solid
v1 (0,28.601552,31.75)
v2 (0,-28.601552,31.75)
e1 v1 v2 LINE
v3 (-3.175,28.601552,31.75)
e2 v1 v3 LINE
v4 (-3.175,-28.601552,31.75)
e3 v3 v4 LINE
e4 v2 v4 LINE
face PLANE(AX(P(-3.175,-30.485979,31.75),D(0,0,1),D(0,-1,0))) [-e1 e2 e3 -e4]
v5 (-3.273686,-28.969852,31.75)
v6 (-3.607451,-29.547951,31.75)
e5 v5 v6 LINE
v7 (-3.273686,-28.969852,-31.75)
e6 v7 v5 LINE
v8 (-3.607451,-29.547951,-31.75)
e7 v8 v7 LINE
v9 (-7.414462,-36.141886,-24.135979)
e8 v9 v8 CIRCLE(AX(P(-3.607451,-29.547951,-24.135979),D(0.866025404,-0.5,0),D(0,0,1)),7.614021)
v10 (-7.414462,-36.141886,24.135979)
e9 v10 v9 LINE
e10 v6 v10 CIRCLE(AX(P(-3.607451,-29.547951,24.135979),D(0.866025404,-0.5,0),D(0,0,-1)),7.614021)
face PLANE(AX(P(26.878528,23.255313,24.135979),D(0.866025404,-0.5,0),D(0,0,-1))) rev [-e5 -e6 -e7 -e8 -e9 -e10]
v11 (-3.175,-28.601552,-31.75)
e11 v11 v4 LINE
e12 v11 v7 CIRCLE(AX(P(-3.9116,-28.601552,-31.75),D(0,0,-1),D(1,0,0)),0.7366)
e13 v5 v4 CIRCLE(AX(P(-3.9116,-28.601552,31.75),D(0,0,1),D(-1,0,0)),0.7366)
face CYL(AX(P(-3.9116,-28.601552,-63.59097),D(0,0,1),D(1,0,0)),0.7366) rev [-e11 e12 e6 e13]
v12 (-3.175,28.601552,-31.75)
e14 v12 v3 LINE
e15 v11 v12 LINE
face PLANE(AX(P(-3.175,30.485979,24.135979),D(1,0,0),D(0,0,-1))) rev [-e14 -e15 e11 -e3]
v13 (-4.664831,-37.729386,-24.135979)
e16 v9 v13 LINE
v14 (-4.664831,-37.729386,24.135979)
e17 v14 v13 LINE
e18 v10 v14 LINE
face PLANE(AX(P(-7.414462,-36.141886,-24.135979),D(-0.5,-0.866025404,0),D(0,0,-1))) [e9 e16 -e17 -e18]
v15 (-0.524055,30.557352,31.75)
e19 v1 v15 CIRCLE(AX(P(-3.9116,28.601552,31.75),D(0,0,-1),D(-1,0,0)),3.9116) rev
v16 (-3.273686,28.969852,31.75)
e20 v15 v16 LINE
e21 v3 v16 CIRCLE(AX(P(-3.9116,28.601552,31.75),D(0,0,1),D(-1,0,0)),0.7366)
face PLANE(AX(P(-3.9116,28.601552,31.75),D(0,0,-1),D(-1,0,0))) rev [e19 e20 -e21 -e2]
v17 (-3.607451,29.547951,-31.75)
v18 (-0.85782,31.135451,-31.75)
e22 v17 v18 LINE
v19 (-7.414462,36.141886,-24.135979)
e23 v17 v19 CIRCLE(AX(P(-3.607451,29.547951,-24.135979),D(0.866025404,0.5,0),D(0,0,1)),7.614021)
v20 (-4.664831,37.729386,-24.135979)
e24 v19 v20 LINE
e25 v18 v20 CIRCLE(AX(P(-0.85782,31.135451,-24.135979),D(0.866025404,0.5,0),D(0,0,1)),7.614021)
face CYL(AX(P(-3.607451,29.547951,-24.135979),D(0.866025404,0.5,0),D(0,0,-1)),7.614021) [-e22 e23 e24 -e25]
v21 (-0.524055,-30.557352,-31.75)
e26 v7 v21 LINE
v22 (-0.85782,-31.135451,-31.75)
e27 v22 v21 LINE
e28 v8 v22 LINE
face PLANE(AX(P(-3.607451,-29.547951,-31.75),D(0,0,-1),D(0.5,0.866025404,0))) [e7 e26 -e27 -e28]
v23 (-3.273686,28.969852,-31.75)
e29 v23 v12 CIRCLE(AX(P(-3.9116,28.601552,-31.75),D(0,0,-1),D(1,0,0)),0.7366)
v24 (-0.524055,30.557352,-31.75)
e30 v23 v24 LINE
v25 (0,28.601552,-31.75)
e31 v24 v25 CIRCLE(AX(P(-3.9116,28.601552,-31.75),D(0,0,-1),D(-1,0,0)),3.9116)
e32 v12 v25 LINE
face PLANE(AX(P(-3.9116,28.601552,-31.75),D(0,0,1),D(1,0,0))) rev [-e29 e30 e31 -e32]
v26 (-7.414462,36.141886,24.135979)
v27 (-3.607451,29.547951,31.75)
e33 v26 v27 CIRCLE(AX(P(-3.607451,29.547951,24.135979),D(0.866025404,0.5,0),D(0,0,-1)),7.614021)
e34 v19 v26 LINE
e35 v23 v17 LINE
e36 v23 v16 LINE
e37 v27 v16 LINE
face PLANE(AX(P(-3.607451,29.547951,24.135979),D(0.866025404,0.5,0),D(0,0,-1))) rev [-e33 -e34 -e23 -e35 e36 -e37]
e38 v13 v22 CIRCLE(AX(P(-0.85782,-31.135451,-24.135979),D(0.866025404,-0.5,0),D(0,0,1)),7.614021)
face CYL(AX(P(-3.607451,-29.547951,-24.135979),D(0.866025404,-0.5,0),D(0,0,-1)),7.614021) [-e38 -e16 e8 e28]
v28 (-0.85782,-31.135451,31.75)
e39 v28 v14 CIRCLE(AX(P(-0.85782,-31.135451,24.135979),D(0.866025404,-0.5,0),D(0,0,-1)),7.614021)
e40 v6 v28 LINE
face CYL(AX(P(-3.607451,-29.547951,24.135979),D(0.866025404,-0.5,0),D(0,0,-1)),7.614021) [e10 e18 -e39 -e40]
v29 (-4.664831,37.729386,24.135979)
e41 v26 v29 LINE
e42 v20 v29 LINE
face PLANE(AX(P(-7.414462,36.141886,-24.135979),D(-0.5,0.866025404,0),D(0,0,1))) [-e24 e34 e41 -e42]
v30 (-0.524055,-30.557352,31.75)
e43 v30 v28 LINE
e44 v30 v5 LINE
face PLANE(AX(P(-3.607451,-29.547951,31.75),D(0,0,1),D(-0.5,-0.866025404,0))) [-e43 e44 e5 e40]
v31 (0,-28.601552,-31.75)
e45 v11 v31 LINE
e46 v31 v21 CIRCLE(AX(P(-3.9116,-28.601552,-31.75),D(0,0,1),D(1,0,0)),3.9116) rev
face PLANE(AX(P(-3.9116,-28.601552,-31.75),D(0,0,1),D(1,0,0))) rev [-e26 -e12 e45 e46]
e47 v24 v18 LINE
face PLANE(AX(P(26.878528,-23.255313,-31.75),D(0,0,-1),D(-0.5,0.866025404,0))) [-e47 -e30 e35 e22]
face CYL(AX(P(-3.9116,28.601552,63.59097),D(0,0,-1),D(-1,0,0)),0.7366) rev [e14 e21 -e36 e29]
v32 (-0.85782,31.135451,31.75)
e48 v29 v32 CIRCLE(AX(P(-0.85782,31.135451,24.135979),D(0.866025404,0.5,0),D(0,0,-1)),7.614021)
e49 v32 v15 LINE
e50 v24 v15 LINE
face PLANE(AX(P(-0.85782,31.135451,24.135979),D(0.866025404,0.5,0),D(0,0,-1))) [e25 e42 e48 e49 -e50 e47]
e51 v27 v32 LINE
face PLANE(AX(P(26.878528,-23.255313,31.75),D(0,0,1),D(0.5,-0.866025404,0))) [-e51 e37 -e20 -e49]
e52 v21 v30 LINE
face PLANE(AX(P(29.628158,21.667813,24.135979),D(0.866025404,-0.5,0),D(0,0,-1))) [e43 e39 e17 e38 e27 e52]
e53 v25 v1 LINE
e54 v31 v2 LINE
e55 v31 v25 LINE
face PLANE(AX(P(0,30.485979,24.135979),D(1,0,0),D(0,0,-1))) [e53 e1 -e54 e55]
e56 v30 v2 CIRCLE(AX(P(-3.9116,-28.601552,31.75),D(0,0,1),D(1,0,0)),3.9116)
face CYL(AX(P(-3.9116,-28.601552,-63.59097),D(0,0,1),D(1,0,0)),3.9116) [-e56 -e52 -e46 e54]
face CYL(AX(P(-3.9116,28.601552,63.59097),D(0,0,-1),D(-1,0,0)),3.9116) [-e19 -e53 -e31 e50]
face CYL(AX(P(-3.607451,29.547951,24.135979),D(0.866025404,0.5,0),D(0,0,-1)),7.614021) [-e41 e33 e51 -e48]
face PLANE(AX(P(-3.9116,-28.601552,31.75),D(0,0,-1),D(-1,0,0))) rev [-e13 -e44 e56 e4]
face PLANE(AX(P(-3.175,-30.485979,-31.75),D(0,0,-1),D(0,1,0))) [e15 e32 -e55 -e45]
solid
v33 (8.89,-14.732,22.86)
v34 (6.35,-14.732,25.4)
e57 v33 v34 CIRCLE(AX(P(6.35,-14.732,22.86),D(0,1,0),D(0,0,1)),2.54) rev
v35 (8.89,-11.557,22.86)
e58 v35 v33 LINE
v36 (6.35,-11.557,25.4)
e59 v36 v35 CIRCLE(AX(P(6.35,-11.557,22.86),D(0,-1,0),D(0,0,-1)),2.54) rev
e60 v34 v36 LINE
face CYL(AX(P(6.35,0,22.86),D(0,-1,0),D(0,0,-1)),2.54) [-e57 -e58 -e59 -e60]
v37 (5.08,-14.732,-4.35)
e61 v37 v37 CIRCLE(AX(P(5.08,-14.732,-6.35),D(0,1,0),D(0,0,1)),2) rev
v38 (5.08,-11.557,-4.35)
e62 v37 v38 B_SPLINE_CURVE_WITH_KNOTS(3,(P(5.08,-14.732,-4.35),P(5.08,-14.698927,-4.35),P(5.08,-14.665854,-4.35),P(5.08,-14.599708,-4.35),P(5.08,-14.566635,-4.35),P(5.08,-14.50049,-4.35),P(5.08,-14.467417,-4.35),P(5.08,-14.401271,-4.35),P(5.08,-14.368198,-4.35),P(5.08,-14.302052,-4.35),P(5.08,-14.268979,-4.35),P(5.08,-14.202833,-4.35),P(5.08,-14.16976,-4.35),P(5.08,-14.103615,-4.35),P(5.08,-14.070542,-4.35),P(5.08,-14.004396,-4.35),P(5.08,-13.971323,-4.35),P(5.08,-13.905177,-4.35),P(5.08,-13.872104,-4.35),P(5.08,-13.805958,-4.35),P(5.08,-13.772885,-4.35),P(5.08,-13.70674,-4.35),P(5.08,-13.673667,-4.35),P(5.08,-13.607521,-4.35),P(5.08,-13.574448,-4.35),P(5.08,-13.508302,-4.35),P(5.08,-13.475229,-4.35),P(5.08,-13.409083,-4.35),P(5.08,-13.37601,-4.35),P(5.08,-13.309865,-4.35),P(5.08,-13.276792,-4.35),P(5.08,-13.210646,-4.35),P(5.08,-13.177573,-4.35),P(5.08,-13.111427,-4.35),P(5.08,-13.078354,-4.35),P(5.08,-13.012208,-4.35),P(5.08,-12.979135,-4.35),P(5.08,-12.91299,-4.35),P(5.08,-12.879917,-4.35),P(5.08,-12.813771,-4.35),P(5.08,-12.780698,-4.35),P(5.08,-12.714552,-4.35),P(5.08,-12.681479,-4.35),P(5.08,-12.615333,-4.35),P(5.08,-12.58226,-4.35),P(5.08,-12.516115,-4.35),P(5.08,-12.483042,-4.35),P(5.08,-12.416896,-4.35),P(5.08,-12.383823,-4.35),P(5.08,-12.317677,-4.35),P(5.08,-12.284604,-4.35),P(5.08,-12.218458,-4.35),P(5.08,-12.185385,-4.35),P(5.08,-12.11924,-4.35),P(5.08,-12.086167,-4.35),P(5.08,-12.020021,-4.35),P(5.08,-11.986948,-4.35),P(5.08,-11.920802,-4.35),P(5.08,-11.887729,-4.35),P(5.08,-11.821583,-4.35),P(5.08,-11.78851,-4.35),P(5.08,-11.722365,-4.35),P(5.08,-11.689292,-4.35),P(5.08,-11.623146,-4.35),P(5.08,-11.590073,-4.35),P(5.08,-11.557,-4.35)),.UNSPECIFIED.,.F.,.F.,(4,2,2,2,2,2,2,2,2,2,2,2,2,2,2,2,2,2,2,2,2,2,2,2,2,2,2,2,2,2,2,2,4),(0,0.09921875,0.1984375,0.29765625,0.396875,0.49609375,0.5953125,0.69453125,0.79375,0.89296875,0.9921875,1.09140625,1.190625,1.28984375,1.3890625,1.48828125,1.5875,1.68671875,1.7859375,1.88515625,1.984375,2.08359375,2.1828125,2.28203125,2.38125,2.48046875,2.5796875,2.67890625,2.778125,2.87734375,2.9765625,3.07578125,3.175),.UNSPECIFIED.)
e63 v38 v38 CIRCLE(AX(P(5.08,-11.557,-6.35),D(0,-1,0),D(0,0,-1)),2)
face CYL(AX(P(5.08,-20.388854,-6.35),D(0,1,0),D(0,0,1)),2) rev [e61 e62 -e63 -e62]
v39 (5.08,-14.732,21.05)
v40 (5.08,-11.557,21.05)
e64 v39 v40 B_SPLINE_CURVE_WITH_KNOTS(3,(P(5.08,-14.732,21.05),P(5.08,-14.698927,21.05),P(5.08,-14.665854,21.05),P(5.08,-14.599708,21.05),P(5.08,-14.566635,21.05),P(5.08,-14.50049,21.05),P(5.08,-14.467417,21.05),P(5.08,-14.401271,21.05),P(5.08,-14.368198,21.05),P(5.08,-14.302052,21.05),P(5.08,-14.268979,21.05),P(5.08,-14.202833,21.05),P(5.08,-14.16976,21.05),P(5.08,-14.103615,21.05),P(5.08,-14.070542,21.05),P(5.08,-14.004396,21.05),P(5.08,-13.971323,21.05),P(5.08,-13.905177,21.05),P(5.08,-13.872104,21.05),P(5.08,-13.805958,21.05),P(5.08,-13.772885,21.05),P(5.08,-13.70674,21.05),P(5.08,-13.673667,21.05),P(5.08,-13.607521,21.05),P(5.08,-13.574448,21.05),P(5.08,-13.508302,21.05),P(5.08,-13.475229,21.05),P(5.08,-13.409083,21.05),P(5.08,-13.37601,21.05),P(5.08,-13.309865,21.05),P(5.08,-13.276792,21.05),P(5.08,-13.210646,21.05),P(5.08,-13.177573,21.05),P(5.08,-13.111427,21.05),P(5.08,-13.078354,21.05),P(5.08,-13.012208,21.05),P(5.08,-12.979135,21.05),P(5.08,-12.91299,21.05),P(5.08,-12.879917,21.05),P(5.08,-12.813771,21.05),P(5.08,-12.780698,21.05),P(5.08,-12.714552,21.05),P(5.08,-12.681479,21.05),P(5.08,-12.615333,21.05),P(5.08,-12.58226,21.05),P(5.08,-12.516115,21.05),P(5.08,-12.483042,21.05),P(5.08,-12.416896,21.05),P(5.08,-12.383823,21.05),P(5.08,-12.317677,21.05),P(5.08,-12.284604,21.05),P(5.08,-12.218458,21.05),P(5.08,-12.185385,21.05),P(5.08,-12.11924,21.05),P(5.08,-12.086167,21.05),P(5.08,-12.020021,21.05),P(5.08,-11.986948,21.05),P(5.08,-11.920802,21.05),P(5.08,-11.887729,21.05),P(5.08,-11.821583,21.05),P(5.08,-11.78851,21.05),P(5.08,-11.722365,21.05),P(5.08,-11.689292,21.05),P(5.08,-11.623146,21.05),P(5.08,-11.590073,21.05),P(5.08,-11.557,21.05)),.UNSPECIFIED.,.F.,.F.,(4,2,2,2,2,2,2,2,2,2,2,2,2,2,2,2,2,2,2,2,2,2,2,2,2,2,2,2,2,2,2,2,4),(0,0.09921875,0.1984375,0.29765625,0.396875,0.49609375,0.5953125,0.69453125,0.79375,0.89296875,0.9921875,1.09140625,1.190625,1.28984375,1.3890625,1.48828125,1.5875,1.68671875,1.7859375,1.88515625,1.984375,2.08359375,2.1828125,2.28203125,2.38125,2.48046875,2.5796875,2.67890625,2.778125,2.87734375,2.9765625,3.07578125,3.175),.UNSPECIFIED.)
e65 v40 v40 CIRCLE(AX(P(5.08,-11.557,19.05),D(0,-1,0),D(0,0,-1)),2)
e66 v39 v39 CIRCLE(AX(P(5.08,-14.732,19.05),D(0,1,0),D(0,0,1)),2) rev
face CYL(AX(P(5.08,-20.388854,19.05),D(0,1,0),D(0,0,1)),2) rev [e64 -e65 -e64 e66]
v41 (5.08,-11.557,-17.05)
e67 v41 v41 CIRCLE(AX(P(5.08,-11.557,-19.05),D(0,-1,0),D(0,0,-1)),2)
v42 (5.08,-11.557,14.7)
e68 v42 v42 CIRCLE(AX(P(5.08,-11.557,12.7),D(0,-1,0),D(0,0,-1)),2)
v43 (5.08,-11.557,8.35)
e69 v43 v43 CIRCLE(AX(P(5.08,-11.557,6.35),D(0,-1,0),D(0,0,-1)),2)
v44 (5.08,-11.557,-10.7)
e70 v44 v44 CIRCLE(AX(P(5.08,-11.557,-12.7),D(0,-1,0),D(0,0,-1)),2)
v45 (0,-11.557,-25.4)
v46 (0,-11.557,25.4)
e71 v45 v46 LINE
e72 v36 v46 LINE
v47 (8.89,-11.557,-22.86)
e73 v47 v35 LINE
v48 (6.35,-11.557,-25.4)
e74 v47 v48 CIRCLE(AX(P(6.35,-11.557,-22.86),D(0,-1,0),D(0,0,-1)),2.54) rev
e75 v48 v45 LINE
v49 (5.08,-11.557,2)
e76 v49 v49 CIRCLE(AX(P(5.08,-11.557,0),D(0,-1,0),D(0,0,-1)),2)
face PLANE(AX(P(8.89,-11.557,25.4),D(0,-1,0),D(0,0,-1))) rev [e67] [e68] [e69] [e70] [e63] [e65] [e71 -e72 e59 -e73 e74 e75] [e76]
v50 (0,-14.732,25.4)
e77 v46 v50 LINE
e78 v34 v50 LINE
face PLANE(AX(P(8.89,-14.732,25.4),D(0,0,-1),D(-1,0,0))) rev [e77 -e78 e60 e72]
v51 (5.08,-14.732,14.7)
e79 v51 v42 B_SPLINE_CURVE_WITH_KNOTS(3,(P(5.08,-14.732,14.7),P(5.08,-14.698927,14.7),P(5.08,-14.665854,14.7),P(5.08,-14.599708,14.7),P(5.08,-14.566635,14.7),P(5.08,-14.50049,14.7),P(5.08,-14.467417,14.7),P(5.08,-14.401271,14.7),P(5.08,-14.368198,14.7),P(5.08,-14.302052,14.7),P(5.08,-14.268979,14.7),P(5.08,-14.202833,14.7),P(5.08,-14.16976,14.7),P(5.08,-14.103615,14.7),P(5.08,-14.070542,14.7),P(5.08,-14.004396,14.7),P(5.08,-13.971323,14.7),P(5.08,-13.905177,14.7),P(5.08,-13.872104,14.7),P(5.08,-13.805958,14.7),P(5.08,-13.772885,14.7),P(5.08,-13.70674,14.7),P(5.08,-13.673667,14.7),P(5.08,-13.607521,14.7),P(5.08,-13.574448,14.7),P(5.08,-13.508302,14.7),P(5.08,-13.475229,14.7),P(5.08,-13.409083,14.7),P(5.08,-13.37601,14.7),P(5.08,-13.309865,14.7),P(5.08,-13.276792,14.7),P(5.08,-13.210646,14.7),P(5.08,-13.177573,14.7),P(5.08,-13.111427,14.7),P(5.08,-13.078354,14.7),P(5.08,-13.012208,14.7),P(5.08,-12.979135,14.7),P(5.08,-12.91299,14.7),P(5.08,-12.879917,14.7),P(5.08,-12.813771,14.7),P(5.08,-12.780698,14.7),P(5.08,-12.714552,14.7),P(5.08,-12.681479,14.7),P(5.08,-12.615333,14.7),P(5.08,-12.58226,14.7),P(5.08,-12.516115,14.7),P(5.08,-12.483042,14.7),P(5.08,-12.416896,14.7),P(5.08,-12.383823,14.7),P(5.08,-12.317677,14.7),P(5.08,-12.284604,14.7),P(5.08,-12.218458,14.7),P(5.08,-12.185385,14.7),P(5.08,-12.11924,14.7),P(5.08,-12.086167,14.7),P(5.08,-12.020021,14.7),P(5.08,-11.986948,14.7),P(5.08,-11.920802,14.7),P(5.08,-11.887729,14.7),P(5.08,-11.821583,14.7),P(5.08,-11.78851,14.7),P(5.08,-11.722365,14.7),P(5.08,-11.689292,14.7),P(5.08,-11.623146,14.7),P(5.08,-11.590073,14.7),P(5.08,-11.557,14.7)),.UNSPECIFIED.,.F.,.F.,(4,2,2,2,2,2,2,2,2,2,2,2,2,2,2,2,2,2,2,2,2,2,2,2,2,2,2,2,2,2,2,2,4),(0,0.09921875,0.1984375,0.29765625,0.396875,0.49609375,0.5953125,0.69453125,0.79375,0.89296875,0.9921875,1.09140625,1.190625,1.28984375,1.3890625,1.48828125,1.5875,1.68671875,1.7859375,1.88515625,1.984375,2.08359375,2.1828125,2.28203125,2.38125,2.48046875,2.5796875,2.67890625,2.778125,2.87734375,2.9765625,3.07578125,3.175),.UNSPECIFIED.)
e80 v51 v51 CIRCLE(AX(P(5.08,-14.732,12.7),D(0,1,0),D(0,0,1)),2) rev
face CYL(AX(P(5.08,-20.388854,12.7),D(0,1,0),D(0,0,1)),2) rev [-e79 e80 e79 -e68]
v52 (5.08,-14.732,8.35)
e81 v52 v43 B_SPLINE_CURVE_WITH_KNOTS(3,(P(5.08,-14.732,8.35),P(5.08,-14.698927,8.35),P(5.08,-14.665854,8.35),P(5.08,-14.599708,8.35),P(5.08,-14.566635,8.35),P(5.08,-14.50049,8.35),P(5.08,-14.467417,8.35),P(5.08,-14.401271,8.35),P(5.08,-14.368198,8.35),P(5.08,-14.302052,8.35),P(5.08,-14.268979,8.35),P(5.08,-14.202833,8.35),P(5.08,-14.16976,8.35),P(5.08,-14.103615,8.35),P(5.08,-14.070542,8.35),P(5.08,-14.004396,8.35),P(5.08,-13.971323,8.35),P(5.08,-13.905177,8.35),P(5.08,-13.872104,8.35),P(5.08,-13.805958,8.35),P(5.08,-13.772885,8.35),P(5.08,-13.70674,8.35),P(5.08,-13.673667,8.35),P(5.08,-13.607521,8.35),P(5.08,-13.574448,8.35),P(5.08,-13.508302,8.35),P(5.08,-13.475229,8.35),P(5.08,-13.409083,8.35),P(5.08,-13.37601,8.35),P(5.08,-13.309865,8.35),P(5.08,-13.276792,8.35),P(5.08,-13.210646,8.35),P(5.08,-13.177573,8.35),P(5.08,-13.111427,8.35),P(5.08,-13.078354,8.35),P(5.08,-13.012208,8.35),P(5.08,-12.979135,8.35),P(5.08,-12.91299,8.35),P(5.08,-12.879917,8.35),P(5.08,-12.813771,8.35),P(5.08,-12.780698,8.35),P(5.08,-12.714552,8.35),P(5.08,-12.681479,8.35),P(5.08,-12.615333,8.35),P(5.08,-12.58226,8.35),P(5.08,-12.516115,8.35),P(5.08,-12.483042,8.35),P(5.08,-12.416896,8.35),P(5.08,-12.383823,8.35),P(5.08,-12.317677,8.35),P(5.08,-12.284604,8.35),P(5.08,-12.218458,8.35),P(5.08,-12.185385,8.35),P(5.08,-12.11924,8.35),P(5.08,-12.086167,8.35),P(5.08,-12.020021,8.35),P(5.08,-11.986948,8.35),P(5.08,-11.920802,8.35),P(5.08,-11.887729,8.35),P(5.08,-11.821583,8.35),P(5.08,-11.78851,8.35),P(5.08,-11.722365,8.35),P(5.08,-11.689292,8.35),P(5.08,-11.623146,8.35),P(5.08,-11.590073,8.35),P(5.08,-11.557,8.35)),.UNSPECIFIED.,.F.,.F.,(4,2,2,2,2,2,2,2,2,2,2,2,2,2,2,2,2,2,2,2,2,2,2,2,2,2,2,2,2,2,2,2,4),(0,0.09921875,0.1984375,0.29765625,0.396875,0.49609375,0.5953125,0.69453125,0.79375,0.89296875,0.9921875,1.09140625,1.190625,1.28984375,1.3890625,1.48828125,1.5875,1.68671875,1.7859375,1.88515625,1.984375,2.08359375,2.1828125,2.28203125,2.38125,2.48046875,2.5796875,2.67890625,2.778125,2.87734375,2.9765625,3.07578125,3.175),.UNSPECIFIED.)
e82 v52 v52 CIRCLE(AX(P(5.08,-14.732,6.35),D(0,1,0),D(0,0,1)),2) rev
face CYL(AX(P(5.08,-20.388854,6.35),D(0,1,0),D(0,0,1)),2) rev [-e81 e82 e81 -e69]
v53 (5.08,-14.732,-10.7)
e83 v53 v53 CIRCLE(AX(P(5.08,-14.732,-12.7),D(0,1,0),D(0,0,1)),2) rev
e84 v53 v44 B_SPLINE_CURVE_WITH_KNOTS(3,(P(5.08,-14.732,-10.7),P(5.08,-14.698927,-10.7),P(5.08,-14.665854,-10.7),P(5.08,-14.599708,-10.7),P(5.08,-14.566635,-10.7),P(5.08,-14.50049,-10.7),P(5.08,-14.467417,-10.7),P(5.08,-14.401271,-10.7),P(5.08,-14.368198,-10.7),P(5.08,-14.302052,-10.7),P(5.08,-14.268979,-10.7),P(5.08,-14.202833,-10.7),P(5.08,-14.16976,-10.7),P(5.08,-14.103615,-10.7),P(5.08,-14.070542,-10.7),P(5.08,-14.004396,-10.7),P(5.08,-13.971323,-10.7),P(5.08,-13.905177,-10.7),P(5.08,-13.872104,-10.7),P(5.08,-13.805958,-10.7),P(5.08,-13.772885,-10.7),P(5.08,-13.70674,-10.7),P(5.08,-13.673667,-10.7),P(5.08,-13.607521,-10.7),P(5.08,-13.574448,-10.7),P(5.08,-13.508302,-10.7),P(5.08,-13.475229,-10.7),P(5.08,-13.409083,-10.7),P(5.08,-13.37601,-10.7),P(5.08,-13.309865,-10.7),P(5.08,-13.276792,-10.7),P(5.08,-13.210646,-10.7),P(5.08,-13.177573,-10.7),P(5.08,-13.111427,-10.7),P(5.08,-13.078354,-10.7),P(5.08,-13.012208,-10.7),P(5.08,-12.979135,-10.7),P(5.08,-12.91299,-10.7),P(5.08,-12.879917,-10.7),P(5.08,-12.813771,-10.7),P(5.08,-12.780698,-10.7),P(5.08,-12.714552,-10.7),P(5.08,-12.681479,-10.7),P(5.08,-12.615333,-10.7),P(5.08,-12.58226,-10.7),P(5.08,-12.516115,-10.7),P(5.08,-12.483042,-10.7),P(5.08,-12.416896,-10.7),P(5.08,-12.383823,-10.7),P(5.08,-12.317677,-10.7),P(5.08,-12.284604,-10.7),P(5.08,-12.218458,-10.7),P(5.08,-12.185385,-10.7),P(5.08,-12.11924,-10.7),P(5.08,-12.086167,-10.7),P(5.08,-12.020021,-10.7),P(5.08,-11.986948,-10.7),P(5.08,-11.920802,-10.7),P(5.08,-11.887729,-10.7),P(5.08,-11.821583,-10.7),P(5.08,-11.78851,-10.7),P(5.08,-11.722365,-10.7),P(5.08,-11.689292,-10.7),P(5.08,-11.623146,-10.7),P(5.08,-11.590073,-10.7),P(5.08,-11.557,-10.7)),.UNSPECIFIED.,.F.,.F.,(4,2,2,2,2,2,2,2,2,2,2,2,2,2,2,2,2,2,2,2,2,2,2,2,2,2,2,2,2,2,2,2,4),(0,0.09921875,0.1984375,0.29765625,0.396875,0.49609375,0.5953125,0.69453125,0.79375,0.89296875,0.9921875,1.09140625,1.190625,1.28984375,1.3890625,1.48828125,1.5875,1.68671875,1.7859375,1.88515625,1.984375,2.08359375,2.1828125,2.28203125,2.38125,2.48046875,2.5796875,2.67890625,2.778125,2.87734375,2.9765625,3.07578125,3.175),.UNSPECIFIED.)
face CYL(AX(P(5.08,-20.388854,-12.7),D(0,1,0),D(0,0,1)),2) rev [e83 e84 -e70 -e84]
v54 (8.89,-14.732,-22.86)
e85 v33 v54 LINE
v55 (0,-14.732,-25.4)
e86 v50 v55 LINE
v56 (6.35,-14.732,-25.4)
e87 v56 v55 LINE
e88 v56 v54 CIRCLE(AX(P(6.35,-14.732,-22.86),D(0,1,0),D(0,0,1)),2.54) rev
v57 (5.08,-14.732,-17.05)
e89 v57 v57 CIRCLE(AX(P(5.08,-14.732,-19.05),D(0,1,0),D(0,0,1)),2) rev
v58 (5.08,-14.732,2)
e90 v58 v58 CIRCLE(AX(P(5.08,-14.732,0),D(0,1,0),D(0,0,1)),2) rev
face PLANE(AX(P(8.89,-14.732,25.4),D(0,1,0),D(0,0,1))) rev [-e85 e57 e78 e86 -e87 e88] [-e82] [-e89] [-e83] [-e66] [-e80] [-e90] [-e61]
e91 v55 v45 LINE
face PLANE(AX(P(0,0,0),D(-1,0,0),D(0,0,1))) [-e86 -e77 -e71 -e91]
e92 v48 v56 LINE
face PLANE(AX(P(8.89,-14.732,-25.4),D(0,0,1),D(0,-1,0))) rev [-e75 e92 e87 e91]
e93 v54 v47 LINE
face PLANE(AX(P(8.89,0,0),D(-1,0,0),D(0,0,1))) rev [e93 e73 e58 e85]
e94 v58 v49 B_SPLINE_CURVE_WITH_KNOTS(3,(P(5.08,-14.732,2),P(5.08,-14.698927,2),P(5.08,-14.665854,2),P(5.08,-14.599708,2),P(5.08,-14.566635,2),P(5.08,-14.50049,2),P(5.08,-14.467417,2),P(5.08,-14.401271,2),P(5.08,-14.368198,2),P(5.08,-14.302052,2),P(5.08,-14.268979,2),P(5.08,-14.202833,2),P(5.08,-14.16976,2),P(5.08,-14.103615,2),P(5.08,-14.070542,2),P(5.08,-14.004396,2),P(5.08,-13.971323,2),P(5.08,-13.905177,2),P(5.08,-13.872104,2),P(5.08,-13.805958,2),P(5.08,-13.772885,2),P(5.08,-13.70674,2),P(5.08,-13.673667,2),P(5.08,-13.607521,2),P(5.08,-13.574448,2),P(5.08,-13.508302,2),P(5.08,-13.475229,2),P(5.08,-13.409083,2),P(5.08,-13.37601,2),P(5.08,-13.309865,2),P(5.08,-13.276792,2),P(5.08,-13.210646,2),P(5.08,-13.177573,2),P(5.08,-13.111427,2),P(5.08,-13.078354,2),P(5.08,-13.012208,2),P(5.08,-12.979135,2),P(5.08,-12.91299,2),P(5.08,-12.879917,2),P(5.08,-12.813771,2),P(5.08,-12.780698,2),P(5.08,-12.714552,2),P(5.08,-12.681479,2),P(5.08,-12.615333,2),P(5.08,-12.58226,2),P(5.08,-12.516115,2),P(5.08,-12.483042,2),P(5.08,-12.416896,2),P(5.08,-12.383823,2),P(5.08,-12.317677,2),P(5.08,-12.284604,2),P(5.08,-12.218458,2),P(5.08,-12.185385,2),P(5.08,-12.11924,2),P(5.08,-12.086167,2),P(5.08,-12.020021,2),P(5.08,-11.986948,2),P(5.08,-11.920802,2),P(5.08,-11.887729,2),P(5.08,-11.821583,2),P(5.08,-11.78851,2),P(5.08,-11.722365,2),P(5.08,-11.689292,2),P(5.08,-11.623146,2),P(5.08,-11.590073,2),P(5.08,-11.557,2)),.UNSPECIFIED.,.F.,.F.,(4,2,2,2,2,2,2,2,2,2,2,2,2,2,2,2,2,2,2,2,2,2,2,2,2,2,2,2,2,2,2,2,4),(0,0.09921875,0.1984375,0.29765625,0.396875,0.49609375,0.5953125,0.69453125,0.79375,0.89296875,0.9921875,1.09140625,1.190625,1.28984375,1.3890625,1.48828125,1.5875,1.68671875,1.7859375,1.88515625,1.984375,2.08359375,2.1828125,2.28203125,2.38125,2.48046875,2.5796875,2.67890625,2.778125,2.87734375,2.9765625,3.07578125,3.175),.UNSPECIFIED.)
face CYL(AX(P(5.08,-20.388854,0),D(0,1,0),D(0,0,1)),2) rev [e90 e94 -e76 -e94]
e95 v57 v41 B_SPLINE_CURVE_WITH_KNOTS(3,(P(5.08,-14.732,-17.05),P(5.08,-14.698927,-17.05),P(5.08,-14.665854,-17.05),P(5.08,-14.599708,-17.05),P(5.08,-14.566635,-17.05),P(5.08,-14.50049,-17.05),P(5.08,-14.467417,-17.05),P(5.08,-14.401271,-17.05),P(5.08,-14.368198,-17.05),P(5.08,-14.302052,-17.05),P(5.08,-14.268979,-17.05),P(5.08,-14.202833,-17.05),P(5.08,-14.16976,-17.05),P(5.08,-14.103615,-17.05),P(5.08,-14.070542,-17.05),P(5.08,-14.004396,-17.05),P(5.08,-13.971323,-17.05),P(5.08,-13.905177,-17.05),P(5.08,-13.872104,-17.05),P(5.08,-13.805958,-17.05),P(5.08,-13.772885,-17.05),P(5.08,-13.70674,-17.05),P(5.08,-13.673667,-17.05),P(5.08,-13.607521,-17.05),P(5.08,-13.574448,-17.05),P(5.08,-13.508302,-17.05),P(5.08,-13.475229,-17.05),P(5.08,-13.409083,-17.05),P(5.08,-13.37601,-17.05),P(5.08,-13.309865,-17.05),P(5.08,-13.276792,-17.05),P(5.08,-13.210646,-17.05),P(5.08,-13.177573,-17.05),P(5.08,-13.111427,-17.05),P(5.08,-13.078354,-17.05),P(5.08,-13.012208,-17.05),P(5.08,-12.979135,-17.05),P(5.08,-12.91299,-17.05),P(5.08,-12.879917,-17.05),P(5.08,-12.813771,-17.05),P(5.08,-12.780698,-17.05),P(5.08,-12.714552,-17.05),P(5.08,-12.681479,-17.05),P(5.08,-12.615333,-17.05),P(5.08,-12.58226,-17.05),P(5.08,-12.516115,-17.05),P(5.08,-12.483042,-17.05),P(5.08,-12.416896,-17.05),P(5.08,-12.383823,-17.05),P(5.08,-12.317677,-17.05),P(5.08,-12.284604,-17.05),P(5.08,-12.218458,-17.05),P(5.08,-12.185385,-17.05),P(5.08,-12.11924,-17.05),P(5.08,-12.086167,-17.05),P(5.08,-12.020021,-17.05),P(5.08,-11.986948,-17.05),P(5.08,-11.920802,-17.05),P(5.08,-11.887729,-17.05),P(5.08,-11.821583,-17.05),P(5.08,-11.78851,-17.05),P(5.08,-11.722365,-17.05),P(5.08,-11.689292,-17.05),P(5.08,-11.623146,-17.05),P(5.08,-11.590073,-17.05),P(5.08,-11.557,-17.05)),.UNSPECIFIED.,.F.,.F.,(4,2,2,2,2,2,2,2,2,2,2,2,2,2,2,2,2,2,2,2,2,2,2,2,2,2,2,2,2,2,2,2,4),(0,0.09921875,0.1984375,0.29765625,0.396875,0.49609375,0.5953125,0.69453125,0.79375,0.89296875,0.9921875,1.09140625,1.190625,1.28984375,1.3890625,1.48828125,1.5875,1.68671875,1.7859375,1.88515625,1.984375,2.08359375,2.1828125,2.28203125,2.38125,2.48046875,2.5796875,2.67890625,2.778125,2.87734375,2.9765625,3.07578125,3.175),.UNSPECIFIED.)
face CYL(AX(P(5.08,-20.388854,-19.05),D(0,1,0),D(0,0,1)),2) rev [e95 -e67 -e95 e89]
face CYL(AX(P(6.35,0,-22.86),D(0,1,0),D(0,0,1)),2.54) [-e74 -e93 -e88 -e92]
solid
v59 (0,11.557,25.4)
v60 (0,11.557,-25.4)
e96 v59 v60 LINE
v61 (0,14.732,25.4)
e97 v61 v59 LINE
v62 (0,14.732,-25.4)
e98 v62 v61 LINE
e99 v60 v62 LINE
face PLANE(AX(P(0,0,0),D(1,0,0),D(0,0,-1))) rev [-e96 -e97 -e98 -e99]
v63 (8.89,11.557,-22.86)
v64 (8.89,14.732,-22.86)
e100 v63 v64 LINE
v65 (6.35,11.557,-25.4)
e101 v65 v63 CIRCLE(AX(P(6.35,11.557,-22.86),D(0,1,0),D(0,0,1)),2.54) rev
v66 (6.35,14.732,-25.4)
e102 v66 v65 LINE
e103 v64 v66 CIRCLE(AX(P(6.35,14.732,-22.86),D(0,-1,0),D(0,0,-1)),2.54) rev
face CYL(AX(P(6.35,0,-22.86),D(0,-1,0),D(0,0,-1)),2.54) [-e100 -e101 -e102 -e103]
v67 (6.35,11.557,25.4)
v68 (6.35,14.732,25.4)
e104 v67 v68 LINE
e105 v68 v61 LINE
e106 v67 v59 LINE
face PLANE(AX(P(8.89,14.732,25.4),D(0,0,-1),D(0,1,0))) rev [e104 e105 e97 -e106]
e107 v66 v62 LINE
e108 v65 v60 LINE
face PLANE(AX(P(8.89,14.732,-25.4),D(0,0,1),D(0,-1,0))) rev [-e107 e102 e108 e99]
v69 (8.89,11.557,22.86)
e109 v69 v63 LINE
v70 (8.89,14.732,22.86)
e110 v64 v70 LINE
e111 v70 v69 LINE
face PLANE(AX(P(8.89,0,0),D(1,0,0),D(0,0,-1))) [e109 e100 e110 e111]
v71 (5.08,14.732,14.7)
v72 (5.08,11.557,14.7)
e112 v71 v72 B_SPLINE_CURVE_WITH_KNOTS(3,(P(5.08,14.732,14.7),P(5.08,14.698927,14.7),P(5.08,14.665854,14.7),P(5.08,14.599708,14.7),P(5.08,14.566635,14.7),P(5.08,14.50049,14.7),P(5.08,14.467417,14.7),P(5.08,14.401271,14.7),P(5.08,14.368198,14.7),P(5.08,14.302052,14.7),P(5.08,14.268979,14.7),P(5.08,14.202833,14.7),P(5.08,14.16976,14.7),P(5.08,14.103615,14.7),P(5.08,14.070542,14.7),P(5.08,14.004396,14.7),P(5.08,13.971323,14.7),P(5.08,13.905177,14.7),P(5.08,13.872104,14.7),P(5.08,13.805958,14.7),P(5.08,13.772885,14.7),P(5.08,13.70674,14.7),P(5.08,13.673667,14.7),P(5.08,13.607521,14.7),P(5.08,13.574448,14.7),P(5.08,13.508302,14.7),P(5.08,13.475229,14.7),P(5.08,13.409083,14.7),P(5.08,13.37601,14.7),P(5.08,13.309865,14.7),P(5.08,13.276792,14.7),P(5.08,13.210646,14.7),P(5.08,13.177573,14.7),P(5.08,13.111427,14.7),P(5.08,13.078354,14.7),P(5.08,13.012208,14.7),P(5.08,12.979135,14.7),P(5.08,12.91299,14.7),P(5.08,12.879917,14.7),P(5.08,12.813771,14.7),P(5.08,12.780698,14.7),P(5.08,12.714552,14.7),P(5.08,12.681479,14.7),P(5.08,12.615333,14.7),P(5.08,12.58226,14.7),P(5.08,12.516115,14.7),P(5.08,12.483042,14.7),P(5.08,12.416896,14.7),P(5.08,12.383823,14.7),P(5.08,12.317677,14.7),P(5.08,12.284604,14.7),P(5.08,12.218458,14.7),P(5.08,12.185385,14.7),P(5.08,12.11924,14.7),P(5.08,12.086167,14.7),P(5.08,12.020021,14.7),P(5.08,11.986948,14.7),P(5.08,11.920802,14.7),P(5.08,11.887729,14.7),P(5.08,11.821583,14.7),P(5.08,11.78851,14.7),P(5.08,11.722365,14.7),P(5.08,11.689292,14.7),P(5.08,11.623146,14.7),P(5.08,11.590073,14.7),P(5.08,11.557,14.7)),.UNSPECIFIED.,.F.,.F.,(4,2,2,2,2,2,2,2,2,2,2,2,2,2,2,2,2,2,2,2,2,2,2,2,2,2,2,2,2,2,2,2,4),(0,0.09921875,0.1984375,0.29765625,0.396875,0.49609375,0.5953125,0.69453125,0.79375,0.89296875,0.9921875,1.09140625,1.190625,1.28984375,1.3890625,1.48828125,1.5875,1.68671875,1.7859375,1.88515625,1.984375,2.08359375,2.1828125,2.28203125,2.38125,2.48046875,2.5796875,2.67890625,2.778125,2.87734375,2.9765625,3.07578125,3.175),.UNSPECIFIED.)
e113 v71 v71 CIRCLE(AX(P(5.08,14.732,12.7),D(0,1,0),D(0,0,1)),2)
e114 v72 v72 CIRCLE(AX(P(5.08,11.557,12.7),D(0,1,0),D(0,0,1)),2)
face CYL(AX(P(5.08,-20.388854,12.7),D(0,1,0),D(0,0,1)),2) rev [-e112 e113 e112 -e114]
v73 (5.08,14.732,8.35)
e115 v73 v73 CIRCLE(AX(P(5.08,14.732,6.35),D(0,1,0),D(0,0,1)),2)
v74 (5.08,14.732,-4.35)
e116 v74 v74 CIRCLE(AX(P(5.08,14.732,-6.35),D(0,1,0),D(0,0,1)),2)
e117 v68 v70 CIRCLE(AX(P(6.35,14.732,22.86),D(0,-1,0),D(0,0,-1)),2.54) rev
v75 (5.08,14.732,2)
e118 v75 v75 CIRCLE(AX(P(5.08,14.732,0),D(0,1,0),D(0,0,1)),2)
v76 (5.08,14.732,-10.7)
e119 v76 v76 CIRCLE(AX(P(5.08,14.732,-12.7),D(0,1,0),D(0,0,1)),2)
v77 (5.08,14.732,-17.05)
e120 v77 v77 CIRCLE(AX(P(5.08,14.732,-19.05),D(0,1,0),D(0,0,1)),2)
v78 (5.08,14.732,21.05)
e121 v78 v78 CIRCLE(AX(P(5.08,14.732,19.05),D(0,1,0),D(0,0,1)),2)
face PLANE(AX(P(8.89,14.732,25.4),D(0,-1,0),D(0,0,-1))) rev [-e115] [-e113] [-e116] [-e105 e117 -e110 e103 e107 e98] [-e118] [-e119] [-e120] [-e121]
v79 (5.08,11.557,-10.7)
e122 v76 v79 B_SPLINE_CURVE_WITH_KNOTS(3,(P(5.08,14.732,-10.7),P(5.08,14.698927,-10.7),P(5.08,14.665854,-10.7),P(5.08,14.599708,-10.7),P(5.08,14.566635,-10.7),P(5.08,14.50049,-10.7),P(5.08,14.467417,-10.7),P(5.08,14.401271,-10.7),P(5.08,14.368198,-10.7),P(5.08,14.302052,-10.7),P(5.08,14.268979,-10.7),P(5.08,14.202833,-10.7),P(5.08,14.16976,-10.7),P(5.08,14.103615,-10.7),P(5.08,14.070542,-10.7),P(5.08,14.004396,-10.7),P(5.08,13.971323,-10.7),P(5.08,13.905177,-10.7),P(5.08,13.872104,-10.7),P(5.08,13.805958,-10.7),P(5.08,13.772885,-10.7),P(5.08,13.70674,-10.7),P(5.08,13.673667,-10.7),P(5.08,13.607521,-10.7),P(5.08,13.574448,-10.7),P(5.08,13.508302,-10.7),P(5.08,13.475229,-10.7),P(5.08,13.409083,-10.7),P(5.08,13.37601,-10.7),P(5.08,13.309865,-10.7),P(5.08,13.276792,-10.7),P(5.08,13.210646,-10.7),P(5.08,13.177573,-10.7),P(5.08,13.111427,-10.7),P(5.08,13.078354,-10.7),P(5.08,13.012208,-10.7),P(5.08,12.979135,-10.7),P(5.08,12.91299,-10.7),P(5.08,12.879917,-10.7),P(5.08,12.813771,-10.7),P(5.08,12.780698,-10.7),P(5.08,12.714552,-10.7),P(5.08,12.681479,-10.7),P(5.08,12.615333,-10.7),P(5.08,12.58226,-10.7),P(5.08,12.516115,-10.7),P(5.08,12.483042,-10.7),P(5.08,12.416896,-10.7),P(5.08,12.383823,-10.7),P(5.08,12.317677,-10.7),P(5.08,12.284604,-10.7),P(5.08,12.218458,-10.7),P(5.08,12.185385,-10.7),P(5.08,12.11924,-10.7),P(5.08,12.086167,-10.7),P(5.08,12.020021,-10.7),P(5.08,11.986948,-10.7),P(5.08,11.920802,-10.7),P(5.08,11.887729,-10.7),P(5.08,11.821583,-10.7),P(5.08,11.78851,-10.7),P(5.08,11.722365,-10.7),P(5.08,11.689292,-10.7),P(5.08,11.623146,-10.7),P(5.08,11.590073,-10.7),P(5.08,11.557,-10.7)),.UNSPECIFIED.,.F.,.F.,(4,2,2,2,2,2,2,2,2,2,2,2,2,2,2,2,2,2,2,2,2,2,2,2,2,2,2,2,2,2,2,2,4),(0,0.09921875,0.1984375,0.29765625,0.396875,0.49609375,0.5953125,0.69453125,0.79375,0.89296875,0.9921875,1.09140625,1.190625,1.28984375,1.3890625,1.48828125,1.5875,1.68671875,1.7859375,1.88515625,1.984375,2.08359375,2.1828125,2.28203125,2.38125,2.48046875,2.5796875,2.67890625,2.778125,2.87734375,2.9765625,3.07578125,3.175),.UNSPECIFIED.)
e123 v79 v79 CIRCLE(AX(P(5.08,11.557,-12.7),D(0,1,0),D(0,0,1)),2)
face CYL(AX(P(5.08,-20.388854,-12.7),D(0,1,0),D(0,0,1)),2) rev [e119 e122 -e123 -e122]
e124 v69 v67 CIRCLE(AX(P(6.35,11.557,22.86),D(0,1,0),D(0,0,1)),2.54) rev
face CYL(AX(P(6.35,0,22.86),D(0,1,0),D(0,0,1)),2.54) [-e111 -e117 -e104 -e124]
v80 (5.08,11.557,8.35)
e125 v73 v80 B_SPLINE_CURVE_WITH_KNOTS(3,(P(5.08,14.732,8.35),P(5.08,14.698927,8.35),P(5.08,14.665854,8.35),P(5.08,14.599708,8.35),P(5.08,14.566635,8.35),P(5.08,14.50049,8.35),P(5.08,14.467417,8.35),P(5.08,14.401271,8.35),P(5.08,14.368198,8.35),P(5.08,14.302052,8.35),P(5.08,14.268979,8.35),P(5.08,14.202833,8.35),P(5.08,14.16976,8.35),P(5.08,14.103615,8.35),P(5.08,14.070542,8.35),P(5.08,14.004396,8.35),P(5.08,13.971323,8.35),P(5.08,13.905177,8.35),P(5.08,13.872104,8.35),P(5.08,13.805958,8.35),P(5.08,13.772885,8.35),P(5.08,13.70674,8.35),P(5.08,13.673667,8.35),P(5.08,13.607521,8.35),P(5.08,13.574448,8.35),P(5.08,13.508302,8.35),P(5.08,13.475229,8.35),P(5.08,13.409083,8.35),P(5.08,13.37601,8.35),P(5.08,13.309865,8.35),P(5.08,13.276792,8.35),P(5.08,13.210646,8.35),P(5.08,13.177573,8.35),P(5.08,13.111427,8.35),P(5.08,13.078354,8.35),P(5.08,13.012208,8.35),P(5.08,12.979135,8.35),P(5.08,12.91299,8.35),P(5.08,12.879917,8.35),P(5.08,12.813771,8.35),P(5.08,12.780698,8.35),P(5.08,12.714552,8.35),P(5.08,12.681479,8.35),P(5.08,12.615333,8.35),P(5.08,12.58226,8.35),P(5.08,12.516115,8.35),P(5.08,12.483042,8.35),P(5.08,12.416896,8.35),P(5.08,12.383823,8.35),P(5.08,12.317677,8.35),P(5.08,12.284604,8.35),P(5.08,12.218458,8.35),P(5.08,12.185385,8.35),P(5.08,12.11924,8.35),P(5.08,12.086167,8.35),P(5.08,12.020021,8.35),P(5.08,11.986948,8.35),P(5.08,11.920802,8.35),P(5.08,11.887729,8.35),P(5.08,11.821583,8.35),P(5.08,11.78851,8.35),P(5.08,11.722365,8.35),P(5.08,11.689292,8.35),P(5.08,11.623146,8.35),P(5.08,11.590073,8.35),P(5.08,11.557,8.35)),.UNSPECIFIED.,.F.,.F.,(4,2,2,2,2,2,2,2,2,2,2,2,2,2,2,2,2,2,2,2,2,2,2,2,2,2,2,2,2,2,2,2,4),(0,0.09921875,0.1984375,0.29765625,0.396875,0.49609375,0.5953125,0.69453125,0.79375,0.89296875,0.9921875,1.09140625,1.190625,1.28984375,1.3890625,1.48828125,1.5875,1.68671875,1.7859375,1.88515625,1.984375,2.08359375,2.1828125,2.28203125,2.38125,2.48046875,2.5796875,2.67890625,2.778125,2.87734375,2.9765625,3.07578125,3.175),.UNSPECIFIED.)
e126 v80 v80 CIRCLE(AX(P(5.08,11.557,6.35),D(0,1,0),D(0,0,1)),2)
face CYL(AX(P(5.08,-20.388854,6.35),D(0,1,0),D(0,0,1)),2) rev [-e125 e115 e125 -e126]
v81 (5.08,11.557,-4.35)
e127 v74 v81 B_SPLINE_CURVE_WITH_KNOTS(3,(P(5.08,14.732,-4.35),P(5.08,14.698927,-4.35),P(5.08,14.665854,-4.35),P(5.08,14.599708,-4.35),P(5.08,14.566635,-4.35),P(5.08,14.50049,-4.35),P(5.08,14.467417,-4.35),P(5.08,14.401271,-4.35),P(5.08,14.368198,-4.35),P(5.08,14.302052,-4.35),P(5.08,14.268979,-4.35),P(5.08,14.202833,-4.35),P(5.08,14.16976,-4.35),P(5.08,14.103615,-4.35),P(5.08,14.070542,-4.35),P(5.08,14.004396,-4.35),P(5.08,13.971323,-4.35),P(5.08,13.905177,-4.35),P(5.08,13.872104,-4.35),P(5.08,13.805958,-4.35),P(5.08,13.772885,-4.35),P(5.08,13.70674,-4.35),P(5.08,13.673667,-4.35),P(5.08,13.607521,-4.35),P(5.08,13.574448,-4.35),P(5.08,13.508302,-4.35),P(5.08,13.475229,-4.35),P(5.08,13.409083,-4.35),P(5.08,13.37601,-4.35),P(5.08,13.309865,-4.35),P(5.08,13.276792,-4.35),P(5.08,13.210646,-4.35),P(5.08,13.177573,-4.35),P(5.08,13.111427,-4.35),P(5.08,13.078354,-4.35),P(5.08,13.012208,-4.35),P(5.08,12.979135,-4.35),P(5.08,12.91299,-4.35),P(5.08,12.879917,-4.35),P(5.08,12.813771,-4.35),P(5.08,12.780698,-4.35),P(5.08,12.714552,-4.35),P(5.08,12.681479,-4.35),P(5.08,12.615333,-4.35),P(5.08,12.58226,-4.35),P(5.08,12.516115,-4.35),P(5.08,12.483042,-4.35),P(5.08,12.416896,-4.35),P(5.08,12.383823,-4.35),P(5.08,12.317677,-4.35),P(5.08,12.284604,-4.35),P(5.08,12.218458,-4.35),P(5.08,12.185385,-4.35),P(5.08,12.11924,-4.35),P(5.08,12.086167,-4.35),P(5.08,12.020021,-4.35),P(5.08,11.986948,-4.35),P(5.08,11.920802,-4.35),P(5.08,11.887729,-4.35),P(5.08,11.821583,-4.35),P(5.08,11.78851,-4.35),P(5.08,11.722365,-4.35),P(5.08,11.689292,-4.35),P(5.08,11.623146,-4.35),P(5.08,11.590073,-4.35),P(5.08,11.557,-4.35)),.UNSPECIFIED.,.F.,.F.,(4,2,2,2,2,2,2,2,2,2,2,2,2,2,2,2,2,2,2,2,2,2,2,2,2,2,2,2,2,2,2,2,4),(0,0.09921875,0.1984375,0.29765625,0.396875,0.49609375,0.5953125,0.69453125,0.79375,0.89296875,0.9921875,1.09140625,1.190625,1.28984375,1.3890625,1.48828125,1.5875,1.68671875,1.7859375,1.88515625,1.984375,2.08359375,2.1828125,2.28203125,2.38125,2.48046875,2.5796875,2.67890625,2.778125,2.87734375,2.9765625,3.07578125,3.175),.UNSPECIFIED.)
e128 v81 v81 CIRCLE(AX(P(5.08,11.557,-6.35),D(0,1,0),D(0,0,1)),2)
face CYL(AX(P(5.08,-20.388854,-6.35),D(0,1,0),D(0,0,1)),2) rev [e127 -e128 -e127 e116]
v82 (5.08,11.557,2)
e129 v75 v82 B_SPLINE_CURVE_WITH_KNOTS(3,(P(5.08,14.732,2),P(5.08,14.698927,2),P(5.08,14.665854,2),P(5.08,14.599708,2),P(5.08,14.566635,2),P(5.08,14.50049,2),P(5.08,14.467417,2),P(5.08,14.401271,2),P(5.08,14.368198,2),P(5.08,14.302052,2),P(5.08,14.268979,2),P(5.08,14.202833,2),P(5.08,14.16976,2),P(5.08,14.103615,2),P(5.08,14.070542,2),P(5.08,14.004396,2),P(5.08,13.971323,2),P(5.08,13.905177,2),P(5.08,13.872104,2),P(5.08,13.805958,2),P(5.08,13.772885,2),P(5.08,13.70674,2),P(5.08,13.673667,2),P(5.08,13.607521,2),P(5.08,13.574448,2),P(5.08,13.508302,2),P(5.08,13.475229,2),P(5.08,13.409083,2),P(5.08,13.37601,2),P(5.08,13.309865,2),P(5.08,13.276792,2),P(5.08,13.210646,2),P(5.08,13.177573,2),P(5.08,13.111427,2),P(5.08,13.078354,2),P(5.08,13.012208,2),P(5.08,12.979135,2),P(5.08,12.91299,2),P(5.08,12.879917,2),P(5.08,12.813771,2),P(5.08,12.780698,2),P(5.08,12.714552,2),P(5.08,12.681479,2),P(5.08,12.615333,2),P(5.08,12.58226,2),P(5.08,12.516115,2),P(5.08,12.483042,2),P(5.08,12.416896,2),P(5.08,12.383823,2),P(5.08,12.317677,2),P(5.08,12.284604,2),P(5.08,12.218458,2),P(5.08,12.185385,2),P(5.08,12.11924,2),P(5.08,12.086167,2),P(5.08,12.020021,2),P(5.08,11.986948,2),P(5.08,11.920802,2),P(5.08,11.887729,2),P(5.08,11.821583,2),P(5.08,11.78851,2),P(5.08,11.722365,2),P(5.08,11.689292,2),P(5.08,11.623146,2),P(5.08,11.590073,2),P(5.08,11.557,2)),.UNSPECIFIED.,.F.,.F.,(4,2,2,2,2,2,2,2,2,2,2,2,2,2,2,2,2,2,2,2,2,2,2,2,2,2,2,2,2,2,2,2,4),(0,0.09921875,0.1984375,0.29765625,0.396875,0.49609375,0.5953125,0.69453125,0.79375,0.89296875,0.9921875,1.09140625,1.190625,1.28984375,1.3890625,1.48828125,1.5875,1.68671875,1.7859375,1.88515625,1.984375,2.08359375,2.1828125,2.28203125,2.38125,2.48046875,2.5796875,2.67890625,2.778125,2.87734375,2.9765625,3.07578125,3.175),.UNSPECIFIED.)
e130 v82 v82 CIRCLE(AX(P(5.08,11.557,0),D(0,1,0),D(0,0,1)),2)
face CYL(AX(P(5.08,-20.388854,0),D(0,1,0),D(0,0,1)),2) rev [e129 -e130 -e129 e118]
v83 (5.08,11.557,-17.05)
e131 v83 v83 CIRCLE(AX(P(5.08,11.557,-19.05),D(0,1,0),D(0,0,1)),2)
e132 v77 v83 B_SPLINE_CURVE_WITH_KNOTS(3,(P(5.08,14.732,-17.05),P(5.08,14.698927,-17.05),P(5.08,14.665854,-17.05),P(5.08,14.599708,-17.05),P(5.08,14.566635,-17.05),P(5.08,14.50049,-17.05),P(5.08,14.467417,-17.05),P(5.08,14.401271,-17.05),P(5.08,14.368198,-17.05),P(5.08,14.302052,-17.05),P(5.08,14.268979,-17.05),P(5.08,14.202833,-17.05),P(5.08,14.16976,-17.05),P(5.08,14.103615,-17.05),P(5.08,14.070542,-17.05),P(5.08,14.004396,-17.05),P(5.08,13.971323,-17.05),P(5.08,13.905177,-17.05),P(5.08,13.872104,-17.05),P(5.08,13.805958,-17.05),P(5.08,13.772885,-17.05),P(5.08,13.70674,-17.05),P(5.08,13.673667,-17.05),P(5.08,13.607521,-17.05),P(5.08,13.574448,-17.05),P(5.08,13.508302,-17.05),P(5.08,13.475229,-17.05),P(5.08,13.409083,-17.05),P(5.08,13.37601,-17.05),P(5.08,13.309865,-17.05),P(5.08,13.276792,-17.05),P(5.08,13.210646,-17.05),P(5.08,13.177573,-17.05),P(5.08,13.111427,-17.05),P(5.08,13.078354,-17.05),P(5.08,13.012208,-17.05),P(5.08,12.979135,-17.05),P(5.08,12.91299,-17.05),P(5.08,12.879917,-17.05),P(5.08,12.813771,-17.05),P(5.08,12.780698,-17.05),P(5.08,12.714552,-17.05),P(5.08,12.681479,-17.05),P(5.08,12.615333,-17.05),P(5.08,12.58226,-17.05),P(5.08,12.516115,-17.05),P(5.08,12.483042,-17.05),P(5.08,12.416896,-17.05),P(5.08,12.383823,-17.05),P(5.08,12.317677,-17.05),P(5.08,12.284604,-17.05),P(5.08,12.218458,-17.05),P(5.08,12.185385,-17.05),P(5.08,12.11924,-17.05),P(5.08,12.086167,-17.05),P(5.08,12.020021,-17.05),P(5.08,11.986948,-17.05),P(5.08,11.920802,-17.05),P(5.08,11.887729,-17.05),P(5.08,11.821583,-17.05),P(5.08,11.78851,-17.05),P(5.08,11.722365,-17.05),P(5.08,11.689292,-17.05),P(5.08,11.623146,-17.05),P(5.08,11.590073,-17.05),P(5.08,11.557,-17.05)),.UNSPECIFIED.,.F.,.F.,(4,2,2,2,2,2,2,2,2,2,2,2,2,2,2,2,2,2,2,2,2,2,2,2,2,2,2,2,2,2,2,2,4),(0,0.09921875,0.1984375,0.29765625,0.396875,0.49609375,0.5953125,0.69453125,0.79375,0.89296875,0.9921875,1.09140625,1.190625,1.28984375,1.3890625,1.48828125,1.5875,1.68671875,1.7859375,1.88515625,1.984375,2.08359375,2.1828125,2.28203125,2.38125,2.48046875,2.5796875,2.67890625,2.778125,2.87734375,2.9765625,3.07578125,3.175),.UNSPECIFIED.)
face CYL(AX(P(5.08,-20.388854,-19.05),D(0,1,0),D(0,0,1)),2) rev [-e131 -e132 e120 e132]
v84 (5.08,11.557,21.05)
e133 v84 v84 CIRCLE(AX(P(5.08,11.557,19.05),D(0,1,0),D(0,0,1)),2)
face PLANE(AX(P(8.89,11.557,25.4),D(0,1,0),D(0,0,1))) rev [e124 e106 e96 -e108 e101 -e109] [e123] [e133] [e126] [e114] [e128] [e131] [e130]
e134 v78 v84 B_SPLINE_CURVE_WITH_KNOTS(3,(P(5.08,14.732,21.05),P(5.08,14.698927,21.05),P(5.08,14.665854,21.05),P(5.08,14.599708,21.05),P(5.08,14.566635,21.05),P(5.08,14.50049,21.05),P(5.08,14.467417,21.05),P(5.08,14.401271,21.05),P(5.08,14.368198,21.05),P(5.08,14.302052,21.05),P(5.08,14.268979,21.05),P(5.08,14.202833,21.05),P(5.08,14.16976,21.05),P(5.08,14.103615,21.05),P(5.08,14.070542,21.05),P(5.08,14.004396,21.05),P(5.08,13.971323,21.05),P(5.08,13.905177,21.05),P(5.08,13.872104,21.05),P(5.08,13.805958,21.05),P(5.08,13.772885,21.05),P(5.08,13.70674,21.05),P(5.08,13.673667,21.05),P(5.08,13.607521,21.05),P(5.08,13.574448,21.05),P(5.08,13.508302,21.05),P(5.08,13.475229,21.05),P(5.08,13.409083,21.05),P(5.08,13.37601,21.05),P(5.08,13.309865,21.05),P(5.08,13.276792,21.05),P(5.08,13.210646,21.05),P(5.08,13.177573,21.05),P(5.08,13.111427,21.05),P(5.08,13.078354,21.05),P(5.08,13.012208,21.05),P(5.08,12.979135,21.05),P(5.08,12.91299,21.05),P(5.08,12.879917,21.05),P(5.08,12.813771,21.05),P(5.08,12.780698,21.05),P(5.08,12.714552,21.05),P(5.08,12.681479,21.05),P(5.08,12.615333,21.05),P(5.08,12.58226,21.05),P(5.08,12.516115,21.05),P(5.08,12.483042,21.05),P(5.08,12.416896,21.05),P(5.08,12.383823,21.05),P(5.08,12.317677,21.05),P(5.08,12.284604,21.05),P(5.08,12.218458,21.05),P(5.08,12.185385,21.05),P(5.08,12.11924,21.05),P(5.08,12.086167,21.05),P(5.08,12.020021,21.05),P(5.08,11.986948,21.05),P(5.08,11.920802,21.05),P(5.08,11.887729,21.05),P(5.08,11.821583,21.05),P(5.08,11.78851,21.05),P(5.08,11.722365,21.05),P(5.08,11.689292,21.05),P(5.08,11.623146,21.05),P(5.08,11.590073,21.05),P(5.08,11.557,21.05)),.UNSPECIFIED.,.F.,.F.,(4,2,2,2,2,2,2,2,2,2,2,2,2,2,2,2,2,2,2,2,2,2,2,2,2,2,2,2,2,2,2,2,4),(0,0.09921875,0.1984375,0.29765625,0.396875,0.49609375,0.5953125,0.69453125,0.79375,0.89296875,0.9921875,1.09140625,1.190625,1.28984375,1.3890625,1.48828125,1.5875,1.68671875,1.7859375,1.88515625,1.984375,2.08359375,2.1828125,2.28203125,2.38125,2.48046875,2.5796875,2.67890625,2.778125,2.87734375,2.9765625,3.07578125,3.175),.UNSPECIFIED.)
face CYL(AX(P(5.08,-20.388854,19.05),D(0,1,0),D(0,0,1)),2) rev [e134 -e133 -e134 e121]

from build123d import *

# Parameters (mm, degrees)
BASE_FLANGE1_DEPTH     = 3.175
SKETCHED_START         = -31.75
SKETCHED_BEND3_DEPTH   = 63.5
SKETCHED_BEND3_2_DEPTH = 63.5
SKETCHED_START_2       = -18.235018827
SKETCHED_BEND3_3_DEPTH = 33.059849879
SKETCHED_BEND3_4_DEPTH = 33.059849879
SKETCH11_W             = 50.8
SKETCH11_H             = 3.175
BOSS_EXTRUDE4_DEPTH    = 8.89
BOSS_EXTRUDE4_2_DEPTH  = 8.89
CUT_EXTRUDE1_START     = -29.464
SKETCH14_R             = 2
CUT_EXTRUDE1_DEPTH     = 29.464
FILLET1_R              = 2.54
FILLET2_R              = 2.54


with BuildPart() as part:
    # Base-Flange1: sheet metal written as solids
    # Sketch1 → Base-Flange1 (new body)
    with BuildSketch(Plane(origin=(0, 0, 0), x_dir=(0, 0, -1), z_dir=(1, 0, 0))):
        with BuildLine():
            Line((24.135978559, -38.1), (-24.135978559, -38.1))
            ThreePointArc((-24.135978559, -38.1), (-29.519904752, -35.869904752), (-31.75, -30.485978559))
            Line((-31.75, -30.485978559), (-31.75, 30.485978559))
            ThreePointArc((-31.75, 30.485978559), (-29.519904752, 35.869904752), (-24.135978559, 38.1))
            Line((-24.135978559, 38.1), (24.135978559, 38.1))
            ThreePointArc((24.135978559, 38.1), (29.519904752, 35.869904752), (31.75, 30.485978559))
            Line((31.75, 30.485978559), (31.75, -30.485978559))
            ThreePointArc((31.75, -30.485978559), (29.519904752, -35.869904752), (24.135978559, -38.1))
        make_face()
    extrude(amount=-BASE_FLANGE1_DEPTH)

    # Sketched Bend3: read off the stored shape, not the designer's step
    # Sketched Bend3 outline → Sketched Bend3 (cut)
    with BuildSketch(Plane.XY.offset(SKETCHED_START)):
        with BuildLine():
            Line((-0.524055031, -30.557352043), (-3.175, -35.148923418))
            Line((-3.175, -35.148923418), (-3.175, -38.1))
            Line((-3.175, -38.1), (0, -38.1))
            Line((0, -38.1), (0, -28.601552043))
            ThreePointArc((0, -28.601552043), (-0.133284538, -29.61394862), (-0.524055031, -30.557352043))
        make_face()
        with BuildLine():
            Line((-3.175, 38.1), (-3.175, 35.148923418))
            Line((-3.175, 35.148923418), (-0.524055031, 30.557352043))
            ThreePointArc((-0.524055031, 30.557352043), (-0.133284538, 29.61394862), (0, 28.601552043))
            Line((0, 28.601552043), (0, 38.1))
            Line((0, 38.1), (-3.175, 38.1))
        make_face()
    extrude(amount=SKETCHED_BEND3_DEPTH, mode=Mode.SUBTRACT)

    # Sketched Bend3 2 outline → Sketched Bend3 2 (add)
    with BuildSketch(Plane.XY.offset(SKETCHED_START)):
        with BuildLine():
            ThreePointArc((-3.175, -28.601552043), (-3.200099036, -28.792198152), (-3.273685688, -28.969852043))
            Line((-3.273685688, -28.969852043), (-7.414461709, -36.141886495))
            Line((-7.414461709, -36.141886495), (-4.664831052, -37.729386495))
            Line((-4.664831052, -37.729386495), (-0.524055031, -30.557352043))
            ThreePointArc((-0.524055031, -30.557352043), (-0.133284538, -29.61394862), (0, -28.601552043))
            Line((0, -28.601552043), (0, 28.601552043))
            ThreePointArc((0, 28.601552043), (-0.133284538, 29.61394862), (-0.524055031, 30.557352043))
            Line((-0.524055031, 30.557352043), (-4.664831052, 37.729386495))
            Line((-4.664831052, 37.729386495), (-7.414461709, 36.141886495))
            Line((-7.414461709, 36.141886495), (-3.273685688, 28.969852043))
            ThreePointArc((-3.273685688, 28.969852043), (-3.200099036, 28.792198152), (-3.175, 28.601552043))
            Line((-3.175, 28.601552043), (-3.175, -28.601552043))
        make_face()
    extrude(amount=SKETCHED_BEND3_2_DEPTH)

    # Sketched Bend3 3 outline → Sketched Bend3 3 (cut)
    with BuildSketch(Plane(origin=(0, 0, 0), x_dir=(0.500000000000001, 0.866025403784438, 0), z_dir=(0.866025403784438, -0.500000000000001, 0)).offset(SKETCHED_START_2)):
        with BuildLine():
            ThreePointArc((-27.393001259, -31.75), (-32.776927452, -29.519904752), (-35.0070227, -24.135978559))
            Line((-35.0070227, -24.135978559), (-35.0070227, -31.75))
            Line((-35.0070227, -31.75), (-27.393001259, -31.75))
        make_face()
        with BuildLine():
            ThreePointArc((-35.0070227, 24.135978559), (-32.776927452, 29.519904752), (-27.393001259, 31.75))
            Line((-27.393001259, 31.75), (-35.0070227, 31.75))
            Line((-35.0070227, 31.75), (-35.0070227, 24.135978559))
        make_face()
    extrude(amount=SKETCHED_BEND3_3_DEPTH, mode=Mode.SUBTRACT)

    # Sketched Bend3 4 outline → Sketched Bend3 4 (cut)
    with BuildSketch(Plane(origin=(0, 0, 0), x_dir=(0.500000000000001, -0.866025403784438, 0), z_dir=(0.866025403784438, 0.500000000000001, 0)).offset(SKETCHED_START_2)):
        with BuildLine():
            ThreePointArc((-27.393001259, -31.75), (-32.776927452, -29.519904752), (-35.0070227, -24.135978559))
            Line((-35.0070227, -24.135978559), (-35.0070227, -31.75))
            Line((-35.0070227, -31.75), (-27.393001259, -31.75))
        make_face()
        with BuildLine():
            ThreePointArc((-35.0070227, 24.135978559), (-32.776927452, 29.519904752), (-27.393001259, 31.75))
            Line((-27.393001259, 31.75), (-35.0070227, 31.75))
            Line((-35.0070227, 31.75), (-35.0070227, 24.135978559))
        make_face()
    extrude(amount=SKETCHED_BEND3_4_DEPTH, mode=Mode.SUBTRACT)


with BuildPart() as body_2:
    # Sketch11 → Boss-Extrude4 (new body)
    with BuildSketch(Plane(origin=(0, 0, 0), x_dir=(0, 0, -1), z_dir=(1, 0, 0))):
        with Locations((0, -13.1445)):
            Rectangle(SKETCH11_W, SKETCH11_H)
    extrude(amount=BOSS_EXTRUDE4_DEPTH)


with BuildPart() as body_3:
    # Sketch11 → Boss-Extrude4 2 (new body)
    with BuildSketch(Plane(origin=(0, 0, 0), x_dir=(0, 0, -1), z_dir=(1, 0, 0))):
        with Locations((0, 13.1445)):
            Rectangle(SKETCH11_W, SKETCH11_H)
    extrude(amount=BOSS_EXTRUDE4_2_DEPTH)


with BuildPart() as cut_extrude1_tool:
    # Sketch14 → Cut-Extrude1 (new body)
    with BuildSketch(Plane(origin=(0, 14.732, 0), x_dir=(1, 0, 0), z_dir=(0, 1, 0)).offset(CUT_EXTRUDE1_START)):
        with Locations(Location((5.08, -12.7, 0), (0, 0, 270))):
            Circle(SKETCH14_R)
        with Locations(Location((5.08, -6.35, 0), (0, 0, 270))):
            Circle(SKETCH14_R)
        with Locations(Location((5.08, 0, 0), (0, 0, 270))):
            Circle(SKETCH14_R)
        with Locations(Location((5.08, 6.35, 0), (0, 0, 270))):
            Circle(SKETCH14_R)
        with Locations(Location((5.08, 12.7, 0), (0, 0, 270))):
            Circle(SKETCH14_R)
        with Locations(Location((5.08, -19.05, 0), (0, 0, 270))):
            Circle(SKETCH14_R)
        with Locations(Location((5.08, 19.05, 0), (0, 0, 270))):
            Circle(SKETCH14_R)
    extrude(amount=CUT_EXTRUDE1_DEPTH)


with BuildPart() as body_2_1:
    add(body_2.part)

    # Cut-Extrude1: cut by cut_extrude1_tool
    add(cut_extrude1_tool.part, mode=Mode.SUBTRACT)

    # Fillet1
    fillet1_edges = [body_2_1.edges().sort_by_distance(p)[0] for p in [
        (8.89, -13.1445, -25.4),
        (8.89, -13.1445, 25.4),
    ]]
    fillet(fillet1_edges, radius=FILLET1_R)


with BuildPart() as body_3_1:
    add(body_3.part)

    # Cut-Extrude1: cut by cut_extrude1_tool
    add(cut_extrude1_tool.part, mode=Mode.SUBTRACT)

    # Fillet2
    fillet2_edges = [body_3_1.edges().sort_by_distance(p)[0] for p in [
        (8.89, 13.1445, -25.4),
        (8.89, 13.1445, 25.4),
    ]]
    fillet(fillet2_edges, radius=FILLET2_R)


solid = Compound([part.part, body_2_1.part, body_3_1.part])
